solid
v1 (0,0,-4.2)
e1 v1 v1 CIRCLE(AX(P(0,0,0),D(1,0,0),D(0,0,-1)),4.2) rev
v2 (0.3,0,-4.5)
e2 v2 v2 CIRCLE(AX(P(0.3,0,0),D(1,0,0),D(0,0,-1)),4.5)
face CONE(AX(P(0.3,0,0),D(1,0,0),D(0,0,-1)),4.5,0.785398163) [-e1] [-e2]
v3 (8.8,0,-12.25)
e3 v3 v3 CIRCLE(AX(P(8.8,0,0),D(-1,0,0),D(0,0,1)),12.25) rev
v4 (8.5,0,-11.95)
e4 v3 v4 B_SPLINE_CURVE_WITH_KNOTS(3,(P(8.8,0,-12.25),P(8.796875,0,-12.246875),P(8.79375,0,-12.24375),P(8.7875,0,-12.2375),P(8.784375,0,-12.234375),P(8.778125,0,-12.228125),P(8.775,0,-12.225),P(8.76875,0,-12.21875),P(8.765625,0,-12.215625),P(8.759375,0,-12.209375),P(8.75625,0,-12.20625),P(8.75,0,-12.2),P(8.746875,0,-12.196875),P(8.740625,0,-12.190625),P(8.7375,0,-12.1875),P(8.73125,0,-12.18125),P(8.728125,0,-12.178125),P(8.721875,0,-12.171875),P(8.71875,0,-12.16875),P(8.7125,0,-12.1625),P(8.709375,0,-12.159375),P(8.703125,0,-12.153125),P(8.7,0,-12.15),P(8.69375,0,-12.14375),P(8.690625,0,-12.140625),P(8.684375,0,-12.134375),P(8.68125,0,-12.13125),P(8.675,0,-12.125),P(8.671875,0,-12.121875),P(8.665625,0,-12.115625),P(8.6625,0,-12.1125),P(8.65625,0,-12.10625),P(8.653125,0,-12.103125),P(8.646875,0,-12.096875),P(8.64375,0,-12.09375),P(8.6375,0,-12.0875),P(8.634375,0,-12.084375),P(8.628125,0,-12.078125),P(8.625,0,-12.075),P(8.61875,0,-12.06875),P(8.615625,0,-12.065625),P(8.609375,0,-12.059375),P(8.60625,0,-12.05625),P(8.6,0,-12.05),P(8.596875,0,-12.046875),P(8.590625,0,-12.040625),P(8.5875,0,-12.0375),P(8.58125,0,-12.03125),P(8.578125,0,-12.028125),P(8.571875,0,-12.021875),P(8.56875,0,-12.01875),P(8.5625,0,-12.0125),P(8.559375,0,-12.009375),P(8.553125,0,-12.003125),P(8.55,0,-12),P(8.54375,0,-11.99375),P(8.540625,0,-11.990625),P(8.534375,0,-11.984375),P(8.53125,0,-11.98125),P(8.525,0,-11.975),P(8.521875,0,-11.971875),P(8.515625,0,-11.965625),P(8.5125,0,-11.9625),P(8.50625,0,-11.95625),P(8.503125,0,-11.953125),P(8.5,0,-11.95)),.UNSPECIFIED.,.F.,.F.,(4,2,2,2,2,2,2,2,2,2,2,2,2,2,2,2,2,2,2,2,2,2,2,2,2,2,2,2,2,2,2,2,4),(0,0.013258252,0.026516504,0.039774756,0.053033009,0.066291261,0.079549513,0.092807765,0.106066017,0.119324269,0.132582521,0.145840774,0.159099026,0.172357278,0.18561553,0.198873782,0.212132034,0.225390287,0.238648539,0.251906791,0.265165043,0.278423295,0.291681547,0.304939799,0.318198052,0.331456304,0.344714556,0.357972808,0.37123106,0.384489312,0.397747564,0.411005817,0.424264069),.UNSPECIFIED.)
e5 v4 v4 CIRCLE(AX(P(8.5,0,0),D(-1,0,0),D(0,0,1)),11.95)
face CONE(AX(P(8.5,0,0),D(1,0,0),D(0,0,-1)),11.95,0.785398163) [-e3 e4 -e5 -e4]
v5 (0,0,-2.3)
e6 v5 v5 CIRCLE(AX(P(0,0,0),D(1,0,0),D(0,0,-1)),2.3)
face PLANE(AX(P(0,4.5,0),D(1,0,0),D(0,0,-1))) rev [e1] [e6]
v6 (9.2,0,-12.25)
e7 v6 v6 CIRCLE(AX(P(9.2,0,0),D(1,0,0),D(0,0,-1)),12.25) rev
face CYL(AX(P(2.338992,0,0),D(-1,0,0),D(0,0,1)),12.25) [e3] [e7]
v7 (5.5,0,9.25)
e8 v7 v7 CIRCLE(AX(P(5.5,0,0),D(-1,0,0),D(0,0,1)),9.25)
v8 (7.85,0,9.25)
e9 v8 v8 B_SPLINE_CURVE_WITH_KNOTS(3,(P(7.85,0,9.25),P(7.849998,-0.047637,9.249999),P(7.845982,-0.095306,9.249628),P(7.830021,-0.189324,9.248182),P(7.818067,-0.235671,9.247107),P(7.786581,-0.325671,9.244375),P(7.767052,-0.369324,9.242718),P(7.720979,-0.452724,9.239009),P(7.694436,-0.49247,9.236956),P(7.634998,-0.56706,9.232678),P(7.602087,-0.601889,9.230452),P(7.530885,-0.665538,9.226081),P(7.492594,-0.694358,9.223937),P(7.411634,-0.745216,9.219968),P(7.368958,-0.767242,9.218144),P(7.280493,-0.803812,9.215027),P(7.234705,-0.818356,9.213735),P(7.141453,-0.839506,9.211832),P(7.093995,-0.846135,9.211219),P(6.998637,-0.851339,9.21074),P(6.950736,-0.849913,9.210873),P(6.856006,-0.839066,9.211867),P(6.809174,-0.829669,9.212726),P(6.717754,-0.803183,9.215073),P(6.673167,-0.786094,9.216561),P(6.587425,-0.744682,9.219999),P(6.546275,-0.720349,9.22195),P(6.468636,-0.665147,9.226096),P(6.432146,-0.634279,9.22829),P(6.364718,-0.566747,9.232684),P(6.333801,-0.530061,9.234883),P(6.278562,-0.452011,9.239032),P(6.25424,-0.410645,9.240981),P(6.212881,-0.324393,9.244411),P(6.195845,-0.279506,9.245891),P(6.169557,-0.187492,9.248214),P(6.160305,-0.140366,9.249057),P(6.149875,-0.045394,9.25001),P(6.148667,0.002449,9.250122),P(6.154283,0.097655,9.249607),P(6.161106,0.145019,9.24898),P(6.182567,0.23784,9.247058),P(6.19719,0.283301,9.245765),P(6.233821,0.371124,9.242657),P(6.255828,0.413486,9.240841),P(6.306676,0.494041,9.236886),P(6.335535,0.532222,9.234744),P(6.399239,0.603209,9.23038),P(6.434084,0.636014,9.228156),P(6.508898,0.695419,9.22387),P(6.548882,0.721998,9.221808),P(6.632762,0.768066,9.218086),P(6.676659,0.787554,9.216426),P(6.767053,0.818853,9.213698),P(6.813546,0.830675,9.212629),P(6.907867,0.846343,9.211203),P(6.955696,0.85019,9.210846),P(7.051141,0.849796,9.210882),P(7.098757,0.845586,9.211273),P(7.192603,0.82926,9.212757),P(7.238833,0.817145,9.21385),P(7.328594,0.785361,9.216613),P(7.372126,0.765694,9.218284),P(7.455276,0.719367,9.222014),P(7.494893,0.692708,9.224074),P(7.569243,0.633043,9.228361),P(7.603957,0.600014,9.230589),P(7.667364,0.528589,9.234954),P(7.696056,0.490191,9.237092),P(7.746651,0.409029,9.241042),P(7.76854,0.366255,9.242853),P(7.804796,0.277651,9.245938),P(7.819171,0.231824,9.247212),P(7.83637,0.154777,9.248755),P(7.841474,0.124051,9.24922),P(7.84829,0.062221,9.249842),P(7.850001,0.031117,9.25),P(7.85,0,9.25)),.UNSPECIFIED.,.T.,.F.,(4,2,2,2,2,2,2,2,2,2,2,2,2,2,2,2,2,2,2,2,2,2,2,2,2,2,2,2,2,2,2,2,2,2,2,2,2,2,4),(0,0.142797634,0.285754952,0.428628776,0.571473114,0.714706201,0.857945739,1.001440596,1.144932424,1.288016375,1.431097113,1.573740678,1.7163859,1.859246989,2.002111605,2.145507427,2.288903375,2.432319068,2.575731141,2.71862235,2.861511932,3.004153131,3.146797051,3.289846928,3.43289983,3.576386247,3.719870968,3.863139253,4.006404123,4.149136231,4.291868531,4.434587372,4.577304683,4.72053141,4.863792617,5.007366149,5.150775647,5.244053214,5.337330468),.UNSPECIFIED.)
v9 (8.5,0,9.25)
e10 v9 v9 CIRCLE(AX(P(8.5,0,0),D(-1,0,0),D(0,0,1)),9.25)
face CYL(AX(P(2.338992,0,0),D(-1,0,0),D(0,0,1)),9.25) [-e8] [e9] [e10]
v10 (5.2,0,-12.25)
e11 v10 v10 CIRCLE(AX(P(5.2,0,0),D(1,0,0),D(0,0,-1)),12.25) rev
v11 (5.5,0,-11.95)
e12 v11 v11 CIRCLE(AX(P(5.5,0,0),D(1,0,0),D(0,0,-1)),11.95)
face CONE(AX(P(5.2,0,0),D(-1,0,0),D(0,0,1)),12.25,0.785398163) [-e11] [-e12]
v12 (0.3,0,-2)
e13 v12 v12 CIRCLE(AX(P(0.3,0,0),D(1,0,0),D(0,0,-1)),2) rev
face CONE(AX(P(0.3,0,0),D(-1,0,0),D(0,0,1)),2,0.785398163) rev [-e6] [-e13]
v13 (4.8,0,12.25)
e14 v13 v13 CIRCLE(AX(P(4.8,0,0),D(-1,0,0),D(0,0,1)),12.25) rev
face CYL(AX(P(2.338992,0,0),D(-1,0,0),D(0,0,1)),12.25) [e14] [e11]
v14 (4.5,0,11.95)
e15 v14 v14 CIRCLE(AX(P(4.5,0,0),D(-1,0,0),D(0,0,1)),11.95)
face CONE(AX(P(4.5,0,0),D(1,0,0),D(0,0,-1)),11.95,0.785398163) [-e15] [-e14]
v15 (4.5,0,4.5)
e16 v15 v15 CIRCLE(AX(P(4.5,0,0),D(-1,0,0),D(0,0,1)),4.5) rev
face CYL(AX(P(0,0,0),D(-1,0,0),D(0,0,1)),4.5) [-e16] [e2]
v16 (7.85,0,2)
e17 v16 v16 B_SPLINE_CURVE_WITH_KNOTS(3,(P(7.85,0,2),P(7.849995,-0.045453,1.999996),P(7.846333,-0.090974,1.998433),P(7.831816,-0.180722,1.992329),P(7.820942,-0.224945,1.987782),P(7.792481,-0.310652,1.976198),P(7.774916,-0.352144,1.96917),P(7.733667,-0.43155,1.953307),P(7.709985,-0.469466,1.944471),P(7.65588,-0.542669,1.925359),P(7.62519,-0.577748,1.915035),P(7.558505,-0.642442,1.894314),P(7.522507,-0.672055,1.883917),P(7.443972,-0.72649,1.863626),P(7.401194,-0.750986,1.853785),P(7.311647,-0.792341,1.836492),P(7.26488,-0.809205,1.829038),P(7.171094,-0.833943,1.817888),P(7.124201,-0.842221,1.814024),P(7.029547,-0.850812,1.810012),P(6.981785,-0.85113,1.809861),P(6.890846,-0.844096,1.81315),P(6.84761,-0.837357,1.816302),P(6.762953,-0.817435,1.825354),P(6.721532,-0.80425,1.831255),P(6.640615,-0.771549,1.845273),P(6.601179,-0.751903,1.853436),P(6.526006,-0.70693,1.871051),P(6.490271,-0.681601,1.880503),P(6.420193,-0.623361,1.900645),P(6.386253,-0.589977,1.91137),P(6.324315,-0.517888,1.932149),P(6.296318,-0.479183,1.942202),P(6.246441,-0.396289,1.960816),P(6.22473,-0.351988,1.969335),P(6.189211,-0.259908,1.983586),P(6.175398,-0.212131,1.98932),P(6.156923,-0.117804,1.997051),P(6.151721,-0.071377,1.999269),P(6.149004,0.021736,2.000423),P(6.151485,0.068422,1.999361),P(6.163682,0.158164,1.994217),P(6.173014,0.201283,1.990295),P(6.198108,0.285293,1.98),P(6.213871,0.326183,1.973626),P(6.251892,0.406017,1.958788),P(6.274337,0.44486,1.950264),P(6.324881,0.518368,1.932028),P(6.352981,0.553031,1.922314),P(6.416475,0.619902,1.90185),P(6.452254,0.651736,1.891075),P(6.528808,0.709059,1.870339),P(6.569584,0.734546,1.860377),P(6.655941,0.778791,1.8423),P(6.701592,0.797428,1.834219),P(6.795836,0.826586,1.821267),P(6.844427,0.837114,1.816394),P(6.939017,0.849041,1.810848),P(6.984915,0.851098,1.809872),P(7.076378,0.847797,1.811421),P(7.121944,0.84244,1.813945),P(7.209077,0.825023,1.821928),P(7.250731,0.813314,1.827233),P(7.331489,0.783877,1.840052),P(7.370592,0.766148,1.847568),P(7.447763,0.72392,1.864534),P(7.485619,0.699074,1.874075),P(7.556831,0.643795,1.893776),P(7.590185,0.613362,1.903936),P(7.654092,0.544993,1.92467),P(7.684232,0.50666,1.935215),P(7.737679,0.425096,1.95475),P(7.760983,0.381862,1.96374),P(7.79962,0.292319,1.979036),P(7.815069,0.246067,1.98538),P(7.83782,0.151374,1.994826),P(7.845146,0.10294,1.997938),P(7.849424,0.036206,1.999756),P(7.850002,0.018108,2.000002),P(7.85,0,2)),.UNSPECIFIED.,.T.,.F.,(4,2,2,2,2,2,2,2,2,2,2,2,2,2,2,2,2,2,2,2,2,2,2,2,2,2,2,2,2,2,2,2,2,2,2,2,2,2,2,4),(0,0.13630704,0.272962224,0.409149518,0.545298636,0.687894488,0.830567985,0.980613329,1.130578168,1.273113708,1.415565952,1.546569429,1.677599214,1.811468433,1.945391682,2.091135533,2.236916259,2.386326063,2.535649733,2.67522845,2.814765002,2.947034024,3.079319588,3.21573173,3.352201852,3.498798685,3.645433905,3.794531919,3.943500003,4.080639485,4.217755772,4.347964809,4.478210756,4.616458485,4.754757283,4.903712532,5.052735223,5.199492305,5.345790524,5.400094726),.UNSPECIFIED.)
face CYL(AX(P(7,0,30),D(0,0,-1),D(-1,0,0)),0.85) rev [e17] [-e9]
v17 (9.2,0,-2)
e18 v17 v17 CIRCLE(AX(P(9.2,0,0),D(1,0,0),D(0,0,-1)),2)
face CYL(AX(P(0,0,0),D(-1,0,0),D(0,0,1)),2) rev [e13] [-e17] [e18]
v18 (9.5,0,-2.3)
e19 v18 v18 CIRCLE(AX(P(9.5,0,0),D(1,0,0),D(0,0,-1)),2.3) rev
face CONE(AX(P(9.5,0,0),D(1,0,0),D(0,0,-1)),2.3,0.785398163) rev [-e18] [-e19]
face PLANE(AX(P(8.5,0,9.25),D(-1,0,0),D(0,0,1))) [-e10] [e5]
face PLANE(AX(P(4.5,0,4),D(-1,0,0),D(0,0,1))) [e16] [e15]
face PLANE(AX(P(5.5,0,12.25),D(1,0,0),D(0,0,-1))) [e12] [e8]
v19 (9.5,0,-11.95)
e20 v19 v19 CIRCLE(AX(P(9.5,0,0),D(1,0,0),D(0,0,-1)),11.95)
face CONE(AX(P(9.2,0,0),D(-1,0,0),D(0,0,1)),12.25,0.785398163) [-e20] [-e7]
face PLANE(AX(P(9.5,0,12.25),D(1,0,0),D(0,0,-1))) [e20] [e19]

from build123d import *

# Parameters (mm, degrees)
SCHNITT_LINEAR_START                    = -20
SCHNITT_LINEAR_AUSTRAGEN1_OUTLINE_R     = 4.5
SCHNITT_LINEAR_AUSTRAGEN1_OUTLINE_R_2   = 2
SCHNITT_LINEAR_AUSTRAGEN1_DEPTH         = 6.199999898
SCHNITT_LINEAR_START_2                  = -12.199999898
SCHNITT_LINEAR_AUSTRAGEN1_2_OUTLINE_R   = 4.5
SCHNITT_LINEAR_AUSTRAGEN1_2_OUTLINE_R_2 = 2
SCHNITT_LINEAR_AUSTRAGEN1_2_DEPTH       = 6.199999898
SCHNITT_LINEAR_START_3                  = 6.199999898
SCHNITT_LINEAR_AUSTRAGEN1_3_OUTLINE_R   = 4.5
SCHNITT_LINEAR_AUSTRAGEN1_3_OUTLINE_R_2 = 2
SCHNITT_LINEAR_AUSTRAGEN1_3_DEPTH       = 1.600000204
SCHNITT_LINEAR_START_4                  = 1
SCHNITT_LINEAR_AUSTRAGEN1_4_OUTLINE_R   = 0.8
SCHNITT_LINEAR_AUSTRAGEN1_4_DEPTH       = 5
SKIZZE5_R                               = 0.85
SCHNITT_LINEAR_AUSTRAGEN2_DEPTH         = 30
SCHNITT_LINEAR_START_5                  = -4.5
SKIZZE6_R                               = 4.5
SCHNITT_LINEAR_AUSTRAGEN3_DEPTH         = 4.5
FASE1_SIZE                              = 0.3


with BuildPart() as part:
    # Schnitt-Linear austragen1: read off the stored shape, not the designer's step
    # Schnitt-Linear austragen1 outline → Schnitt-Linear austragen1 (new body)
    with BuildSketch(Plane(origin=(20, 0, 0), x_dir=(0, 0, -1), z_dir=(1, 0, 0)).offset(SCHNITT_LINEAR_START)):
        Circle(SCHNITT_LINEAR_AUSTRAGEN1_OUTLINE_R)
        Circle(SCHNITT_LINEAR_AUSTRAGEN1_OUTLINE_R_2, mode=Mode.SUBTRACT)
    extrude(amount=SCHNITT_LINEAR_AUSTRAGEN1_DEPTH)



with BuildPart() as body_2:
    # Schnitt-Linear austragen1 2 outline → Schnitt-Linear austragen1 2 (new body)
    with BuildSketch(Plane(origin=(20, 0, 0), x_dir=(0, 0, -1), z_dir=(1, 0, 0)).offset(SCHNITT_LINEAR_START_2)):
        Circle(SCHNITT_LINEAR_AUSTRAGEN1_2_OUTLINE_R)
        Circle(SCHNITT_LINEAR_AUSTRAGEN1_2_OUTLINE_R_2, mode=Mode.SUBTRACT)
    extrude(amount=SCHNITT_LINEAR_AUSTRAGEN1_2_DEPTH)


with BuildPart() as part_1:
    add(part.part)

    add(body_2.part)  # Schnitt-Linear austragen1 3 merges body 2
    # Schnitt-Linear austragen1 3 outline → Schnitt-Linear austragen1 3 (add)
    with BuildSketch(Plane.YZ.offset(SCHNITT_LINEAR_START_3)):
        Circle(SCHNITT_LINEAR_AUSTRAGEN1_3_OUTLINE_R)
        Circle(SCHNITT_LINEAR_AUSTRAGEN1_3_OUTLINE_R_2, mode=Mode.SUBTRACT)
    extrude(amount=SCHNITT_LINEAR_AUSTRAGEN1_3_DEPTH)

    # Schnitt-Linear austragen1 4 outline → Schnitt-Linear austragen1 4 (cut)
    with BuildSketch(Plane.XY.offset(SCHNITT_LINEAR_START_4)):
        with Locations((7, 0)):
            Circle(SCHNITT_LINEAR_AUSTRAGEN1_4_OUTLINE_R)
    extrude(amount=SCHNITT_LINEAR_AUSTRAGEN1_4_DEPTH, mode=Mode.SUBTRACT)

    # Skizze4 → Rotation1 (revolve)
    with BuildSketch(Plane(origin=(0, 0, 0), x_dir=(1, 0, 0), z_dir=(0, 1, 0))):
        Polygon((4.5, -4), (4.5, -12.25), (5.5, -12.25), (5.5, -9.25), (8.5, -9.25), (8.5, -12.25), (9.5, -12.25), (9.5, -4), align=None)
    revolve(axis=Axis((2.33899179, 0, 0), (1, 0, 0)))

    # Skizze5 → Schnitt-Linear austragen2 (cut)
    with BuildSketch(Plane.XY):
        with Locations(Location((7, 0, 0), (0, 0, 180))):
            Circle(SKIZZE5_R)
    extrude(amount=SCHNITT_LINEAR_AUSTRAGEN2_DEPTH, mode=Mode.SUBTRACT)

    # Skizze6 → Schnitt-Linear austragen3 (cut)
    with BuildSketch(Plane(origin=(14, 0, 0), x_dir=(0, 0, -1), z_dir=(1, 0, 0)).offset(SCHNITT_LINEAR_START_5)):
        with Locations(Location((0, 0, 0), (0, 0, 180))):
            Circle(SKIZZE6_R)
    extrude(amount=SCHNITT_LINEAR_AUSTRAGEN3_DEPTH, mode=Mode.SUBTRACT)

    # Fase1
    # the kernel refuses this chamfer: 0.3 mm, written as the material it takes off along each edge
    with BuildSketch(Plane(origin=(4.5, 0, 0), x_dir=(0, 0, 1), z_dir=(0, 1, 0))) as fase1_piece_1:
        Polygon((12.25 - FASE1_SIZE, 0), (12.25, FASE1_SIZE), (12.25, 0), align=None)
    revolve(axis=Axis((4.5, 0, 0), (1, 0, 0)), mode=Mode.SUBTRACT)
    with BuildSketch(Plane(origin=(5.5, 0, 0), x_dir=(0, 0, 1), z_dir=(0, 1, 0))) as fase1_piece_2:
        Polygon((12.25, -FASE1_SIZE), (12.25 - FASE1_SIZE, 0), (12.25, 0), align=None)
    revolve(axis=Axis((5.5, 0, 0), (1, 0, 0)), mode=Mode.SUBTRACT)
    with BuildSketch(Plane(origin=(8.5, 0, 0), x_dir=(0, 0, 1), z_dir=(0, 1, 0))) as fase1_piece_3:
        Polygon((12.25 - FASE1_SIZE, 0), (12.25, FASE1_SIZE), (12.25, 0), align=None)
    revolve(axis=Axis((8.5, 0, 0), (1, 0, 0)), mode=Mode.SUBTRACT)
    with BuildSketch(Plane(origin=(9.5, 0, 0), x_dir=(0, 0, 1), z_dir=(0, 1, 0))) as fase1_piece_4:
        Polygon((12.25, -FASE1_SIZE), (12.25 - FASE1_SIZE, 0), (12.25, 0), align=None)
    revolve(axis=Axis((9.5, 0, 0), (1, 0, 0)), mode=Mode.SUBTRACT)
    with BuildSketch(Plane(origin=(9.5, 0, 0), x_dir=(0, 0, -1), z_dir=(0, -1, 0))) as fase1_piece_5:
        Polygon((2 + FASE1_SIZE, 0), (2, -FASE1_SIZE), (2, 0), align=None)
    revolve(axis=Axis((9.5, 0, 0), (1, 0, 0)), mode=Mode.SUBTRACT)
    with BuildSketch(Plane(origin=(0, 0, 0), x_dir=(0, 0, -1), z_dir=(0, -1, 0))) as fase1_piece_6:
        Polygon((2, FASE1_SIZE), (2 + FASE1_SIZE, 0), (2, 0), align=None)
    revolve(axis=Axis((0, 0, 0), (1, 0, 0)), mode=Mode.SUBTRACT)
    with BuildSketch(Plane(origin=(0, 0, 0), x_dir=(0, 0, -1), z_dir=(0, -1, 0))) as fase1_piece_7:
        Polygon((4.5, FASE1_SIZE), (4.5 - FASE1_SIZE, 0), (4.5, 0), align=None)
    revolve(axis=Axis((0, 0, 0), (1, 0, 0)), mode=Mode.SUBTRACT)


solid = part_1.part
